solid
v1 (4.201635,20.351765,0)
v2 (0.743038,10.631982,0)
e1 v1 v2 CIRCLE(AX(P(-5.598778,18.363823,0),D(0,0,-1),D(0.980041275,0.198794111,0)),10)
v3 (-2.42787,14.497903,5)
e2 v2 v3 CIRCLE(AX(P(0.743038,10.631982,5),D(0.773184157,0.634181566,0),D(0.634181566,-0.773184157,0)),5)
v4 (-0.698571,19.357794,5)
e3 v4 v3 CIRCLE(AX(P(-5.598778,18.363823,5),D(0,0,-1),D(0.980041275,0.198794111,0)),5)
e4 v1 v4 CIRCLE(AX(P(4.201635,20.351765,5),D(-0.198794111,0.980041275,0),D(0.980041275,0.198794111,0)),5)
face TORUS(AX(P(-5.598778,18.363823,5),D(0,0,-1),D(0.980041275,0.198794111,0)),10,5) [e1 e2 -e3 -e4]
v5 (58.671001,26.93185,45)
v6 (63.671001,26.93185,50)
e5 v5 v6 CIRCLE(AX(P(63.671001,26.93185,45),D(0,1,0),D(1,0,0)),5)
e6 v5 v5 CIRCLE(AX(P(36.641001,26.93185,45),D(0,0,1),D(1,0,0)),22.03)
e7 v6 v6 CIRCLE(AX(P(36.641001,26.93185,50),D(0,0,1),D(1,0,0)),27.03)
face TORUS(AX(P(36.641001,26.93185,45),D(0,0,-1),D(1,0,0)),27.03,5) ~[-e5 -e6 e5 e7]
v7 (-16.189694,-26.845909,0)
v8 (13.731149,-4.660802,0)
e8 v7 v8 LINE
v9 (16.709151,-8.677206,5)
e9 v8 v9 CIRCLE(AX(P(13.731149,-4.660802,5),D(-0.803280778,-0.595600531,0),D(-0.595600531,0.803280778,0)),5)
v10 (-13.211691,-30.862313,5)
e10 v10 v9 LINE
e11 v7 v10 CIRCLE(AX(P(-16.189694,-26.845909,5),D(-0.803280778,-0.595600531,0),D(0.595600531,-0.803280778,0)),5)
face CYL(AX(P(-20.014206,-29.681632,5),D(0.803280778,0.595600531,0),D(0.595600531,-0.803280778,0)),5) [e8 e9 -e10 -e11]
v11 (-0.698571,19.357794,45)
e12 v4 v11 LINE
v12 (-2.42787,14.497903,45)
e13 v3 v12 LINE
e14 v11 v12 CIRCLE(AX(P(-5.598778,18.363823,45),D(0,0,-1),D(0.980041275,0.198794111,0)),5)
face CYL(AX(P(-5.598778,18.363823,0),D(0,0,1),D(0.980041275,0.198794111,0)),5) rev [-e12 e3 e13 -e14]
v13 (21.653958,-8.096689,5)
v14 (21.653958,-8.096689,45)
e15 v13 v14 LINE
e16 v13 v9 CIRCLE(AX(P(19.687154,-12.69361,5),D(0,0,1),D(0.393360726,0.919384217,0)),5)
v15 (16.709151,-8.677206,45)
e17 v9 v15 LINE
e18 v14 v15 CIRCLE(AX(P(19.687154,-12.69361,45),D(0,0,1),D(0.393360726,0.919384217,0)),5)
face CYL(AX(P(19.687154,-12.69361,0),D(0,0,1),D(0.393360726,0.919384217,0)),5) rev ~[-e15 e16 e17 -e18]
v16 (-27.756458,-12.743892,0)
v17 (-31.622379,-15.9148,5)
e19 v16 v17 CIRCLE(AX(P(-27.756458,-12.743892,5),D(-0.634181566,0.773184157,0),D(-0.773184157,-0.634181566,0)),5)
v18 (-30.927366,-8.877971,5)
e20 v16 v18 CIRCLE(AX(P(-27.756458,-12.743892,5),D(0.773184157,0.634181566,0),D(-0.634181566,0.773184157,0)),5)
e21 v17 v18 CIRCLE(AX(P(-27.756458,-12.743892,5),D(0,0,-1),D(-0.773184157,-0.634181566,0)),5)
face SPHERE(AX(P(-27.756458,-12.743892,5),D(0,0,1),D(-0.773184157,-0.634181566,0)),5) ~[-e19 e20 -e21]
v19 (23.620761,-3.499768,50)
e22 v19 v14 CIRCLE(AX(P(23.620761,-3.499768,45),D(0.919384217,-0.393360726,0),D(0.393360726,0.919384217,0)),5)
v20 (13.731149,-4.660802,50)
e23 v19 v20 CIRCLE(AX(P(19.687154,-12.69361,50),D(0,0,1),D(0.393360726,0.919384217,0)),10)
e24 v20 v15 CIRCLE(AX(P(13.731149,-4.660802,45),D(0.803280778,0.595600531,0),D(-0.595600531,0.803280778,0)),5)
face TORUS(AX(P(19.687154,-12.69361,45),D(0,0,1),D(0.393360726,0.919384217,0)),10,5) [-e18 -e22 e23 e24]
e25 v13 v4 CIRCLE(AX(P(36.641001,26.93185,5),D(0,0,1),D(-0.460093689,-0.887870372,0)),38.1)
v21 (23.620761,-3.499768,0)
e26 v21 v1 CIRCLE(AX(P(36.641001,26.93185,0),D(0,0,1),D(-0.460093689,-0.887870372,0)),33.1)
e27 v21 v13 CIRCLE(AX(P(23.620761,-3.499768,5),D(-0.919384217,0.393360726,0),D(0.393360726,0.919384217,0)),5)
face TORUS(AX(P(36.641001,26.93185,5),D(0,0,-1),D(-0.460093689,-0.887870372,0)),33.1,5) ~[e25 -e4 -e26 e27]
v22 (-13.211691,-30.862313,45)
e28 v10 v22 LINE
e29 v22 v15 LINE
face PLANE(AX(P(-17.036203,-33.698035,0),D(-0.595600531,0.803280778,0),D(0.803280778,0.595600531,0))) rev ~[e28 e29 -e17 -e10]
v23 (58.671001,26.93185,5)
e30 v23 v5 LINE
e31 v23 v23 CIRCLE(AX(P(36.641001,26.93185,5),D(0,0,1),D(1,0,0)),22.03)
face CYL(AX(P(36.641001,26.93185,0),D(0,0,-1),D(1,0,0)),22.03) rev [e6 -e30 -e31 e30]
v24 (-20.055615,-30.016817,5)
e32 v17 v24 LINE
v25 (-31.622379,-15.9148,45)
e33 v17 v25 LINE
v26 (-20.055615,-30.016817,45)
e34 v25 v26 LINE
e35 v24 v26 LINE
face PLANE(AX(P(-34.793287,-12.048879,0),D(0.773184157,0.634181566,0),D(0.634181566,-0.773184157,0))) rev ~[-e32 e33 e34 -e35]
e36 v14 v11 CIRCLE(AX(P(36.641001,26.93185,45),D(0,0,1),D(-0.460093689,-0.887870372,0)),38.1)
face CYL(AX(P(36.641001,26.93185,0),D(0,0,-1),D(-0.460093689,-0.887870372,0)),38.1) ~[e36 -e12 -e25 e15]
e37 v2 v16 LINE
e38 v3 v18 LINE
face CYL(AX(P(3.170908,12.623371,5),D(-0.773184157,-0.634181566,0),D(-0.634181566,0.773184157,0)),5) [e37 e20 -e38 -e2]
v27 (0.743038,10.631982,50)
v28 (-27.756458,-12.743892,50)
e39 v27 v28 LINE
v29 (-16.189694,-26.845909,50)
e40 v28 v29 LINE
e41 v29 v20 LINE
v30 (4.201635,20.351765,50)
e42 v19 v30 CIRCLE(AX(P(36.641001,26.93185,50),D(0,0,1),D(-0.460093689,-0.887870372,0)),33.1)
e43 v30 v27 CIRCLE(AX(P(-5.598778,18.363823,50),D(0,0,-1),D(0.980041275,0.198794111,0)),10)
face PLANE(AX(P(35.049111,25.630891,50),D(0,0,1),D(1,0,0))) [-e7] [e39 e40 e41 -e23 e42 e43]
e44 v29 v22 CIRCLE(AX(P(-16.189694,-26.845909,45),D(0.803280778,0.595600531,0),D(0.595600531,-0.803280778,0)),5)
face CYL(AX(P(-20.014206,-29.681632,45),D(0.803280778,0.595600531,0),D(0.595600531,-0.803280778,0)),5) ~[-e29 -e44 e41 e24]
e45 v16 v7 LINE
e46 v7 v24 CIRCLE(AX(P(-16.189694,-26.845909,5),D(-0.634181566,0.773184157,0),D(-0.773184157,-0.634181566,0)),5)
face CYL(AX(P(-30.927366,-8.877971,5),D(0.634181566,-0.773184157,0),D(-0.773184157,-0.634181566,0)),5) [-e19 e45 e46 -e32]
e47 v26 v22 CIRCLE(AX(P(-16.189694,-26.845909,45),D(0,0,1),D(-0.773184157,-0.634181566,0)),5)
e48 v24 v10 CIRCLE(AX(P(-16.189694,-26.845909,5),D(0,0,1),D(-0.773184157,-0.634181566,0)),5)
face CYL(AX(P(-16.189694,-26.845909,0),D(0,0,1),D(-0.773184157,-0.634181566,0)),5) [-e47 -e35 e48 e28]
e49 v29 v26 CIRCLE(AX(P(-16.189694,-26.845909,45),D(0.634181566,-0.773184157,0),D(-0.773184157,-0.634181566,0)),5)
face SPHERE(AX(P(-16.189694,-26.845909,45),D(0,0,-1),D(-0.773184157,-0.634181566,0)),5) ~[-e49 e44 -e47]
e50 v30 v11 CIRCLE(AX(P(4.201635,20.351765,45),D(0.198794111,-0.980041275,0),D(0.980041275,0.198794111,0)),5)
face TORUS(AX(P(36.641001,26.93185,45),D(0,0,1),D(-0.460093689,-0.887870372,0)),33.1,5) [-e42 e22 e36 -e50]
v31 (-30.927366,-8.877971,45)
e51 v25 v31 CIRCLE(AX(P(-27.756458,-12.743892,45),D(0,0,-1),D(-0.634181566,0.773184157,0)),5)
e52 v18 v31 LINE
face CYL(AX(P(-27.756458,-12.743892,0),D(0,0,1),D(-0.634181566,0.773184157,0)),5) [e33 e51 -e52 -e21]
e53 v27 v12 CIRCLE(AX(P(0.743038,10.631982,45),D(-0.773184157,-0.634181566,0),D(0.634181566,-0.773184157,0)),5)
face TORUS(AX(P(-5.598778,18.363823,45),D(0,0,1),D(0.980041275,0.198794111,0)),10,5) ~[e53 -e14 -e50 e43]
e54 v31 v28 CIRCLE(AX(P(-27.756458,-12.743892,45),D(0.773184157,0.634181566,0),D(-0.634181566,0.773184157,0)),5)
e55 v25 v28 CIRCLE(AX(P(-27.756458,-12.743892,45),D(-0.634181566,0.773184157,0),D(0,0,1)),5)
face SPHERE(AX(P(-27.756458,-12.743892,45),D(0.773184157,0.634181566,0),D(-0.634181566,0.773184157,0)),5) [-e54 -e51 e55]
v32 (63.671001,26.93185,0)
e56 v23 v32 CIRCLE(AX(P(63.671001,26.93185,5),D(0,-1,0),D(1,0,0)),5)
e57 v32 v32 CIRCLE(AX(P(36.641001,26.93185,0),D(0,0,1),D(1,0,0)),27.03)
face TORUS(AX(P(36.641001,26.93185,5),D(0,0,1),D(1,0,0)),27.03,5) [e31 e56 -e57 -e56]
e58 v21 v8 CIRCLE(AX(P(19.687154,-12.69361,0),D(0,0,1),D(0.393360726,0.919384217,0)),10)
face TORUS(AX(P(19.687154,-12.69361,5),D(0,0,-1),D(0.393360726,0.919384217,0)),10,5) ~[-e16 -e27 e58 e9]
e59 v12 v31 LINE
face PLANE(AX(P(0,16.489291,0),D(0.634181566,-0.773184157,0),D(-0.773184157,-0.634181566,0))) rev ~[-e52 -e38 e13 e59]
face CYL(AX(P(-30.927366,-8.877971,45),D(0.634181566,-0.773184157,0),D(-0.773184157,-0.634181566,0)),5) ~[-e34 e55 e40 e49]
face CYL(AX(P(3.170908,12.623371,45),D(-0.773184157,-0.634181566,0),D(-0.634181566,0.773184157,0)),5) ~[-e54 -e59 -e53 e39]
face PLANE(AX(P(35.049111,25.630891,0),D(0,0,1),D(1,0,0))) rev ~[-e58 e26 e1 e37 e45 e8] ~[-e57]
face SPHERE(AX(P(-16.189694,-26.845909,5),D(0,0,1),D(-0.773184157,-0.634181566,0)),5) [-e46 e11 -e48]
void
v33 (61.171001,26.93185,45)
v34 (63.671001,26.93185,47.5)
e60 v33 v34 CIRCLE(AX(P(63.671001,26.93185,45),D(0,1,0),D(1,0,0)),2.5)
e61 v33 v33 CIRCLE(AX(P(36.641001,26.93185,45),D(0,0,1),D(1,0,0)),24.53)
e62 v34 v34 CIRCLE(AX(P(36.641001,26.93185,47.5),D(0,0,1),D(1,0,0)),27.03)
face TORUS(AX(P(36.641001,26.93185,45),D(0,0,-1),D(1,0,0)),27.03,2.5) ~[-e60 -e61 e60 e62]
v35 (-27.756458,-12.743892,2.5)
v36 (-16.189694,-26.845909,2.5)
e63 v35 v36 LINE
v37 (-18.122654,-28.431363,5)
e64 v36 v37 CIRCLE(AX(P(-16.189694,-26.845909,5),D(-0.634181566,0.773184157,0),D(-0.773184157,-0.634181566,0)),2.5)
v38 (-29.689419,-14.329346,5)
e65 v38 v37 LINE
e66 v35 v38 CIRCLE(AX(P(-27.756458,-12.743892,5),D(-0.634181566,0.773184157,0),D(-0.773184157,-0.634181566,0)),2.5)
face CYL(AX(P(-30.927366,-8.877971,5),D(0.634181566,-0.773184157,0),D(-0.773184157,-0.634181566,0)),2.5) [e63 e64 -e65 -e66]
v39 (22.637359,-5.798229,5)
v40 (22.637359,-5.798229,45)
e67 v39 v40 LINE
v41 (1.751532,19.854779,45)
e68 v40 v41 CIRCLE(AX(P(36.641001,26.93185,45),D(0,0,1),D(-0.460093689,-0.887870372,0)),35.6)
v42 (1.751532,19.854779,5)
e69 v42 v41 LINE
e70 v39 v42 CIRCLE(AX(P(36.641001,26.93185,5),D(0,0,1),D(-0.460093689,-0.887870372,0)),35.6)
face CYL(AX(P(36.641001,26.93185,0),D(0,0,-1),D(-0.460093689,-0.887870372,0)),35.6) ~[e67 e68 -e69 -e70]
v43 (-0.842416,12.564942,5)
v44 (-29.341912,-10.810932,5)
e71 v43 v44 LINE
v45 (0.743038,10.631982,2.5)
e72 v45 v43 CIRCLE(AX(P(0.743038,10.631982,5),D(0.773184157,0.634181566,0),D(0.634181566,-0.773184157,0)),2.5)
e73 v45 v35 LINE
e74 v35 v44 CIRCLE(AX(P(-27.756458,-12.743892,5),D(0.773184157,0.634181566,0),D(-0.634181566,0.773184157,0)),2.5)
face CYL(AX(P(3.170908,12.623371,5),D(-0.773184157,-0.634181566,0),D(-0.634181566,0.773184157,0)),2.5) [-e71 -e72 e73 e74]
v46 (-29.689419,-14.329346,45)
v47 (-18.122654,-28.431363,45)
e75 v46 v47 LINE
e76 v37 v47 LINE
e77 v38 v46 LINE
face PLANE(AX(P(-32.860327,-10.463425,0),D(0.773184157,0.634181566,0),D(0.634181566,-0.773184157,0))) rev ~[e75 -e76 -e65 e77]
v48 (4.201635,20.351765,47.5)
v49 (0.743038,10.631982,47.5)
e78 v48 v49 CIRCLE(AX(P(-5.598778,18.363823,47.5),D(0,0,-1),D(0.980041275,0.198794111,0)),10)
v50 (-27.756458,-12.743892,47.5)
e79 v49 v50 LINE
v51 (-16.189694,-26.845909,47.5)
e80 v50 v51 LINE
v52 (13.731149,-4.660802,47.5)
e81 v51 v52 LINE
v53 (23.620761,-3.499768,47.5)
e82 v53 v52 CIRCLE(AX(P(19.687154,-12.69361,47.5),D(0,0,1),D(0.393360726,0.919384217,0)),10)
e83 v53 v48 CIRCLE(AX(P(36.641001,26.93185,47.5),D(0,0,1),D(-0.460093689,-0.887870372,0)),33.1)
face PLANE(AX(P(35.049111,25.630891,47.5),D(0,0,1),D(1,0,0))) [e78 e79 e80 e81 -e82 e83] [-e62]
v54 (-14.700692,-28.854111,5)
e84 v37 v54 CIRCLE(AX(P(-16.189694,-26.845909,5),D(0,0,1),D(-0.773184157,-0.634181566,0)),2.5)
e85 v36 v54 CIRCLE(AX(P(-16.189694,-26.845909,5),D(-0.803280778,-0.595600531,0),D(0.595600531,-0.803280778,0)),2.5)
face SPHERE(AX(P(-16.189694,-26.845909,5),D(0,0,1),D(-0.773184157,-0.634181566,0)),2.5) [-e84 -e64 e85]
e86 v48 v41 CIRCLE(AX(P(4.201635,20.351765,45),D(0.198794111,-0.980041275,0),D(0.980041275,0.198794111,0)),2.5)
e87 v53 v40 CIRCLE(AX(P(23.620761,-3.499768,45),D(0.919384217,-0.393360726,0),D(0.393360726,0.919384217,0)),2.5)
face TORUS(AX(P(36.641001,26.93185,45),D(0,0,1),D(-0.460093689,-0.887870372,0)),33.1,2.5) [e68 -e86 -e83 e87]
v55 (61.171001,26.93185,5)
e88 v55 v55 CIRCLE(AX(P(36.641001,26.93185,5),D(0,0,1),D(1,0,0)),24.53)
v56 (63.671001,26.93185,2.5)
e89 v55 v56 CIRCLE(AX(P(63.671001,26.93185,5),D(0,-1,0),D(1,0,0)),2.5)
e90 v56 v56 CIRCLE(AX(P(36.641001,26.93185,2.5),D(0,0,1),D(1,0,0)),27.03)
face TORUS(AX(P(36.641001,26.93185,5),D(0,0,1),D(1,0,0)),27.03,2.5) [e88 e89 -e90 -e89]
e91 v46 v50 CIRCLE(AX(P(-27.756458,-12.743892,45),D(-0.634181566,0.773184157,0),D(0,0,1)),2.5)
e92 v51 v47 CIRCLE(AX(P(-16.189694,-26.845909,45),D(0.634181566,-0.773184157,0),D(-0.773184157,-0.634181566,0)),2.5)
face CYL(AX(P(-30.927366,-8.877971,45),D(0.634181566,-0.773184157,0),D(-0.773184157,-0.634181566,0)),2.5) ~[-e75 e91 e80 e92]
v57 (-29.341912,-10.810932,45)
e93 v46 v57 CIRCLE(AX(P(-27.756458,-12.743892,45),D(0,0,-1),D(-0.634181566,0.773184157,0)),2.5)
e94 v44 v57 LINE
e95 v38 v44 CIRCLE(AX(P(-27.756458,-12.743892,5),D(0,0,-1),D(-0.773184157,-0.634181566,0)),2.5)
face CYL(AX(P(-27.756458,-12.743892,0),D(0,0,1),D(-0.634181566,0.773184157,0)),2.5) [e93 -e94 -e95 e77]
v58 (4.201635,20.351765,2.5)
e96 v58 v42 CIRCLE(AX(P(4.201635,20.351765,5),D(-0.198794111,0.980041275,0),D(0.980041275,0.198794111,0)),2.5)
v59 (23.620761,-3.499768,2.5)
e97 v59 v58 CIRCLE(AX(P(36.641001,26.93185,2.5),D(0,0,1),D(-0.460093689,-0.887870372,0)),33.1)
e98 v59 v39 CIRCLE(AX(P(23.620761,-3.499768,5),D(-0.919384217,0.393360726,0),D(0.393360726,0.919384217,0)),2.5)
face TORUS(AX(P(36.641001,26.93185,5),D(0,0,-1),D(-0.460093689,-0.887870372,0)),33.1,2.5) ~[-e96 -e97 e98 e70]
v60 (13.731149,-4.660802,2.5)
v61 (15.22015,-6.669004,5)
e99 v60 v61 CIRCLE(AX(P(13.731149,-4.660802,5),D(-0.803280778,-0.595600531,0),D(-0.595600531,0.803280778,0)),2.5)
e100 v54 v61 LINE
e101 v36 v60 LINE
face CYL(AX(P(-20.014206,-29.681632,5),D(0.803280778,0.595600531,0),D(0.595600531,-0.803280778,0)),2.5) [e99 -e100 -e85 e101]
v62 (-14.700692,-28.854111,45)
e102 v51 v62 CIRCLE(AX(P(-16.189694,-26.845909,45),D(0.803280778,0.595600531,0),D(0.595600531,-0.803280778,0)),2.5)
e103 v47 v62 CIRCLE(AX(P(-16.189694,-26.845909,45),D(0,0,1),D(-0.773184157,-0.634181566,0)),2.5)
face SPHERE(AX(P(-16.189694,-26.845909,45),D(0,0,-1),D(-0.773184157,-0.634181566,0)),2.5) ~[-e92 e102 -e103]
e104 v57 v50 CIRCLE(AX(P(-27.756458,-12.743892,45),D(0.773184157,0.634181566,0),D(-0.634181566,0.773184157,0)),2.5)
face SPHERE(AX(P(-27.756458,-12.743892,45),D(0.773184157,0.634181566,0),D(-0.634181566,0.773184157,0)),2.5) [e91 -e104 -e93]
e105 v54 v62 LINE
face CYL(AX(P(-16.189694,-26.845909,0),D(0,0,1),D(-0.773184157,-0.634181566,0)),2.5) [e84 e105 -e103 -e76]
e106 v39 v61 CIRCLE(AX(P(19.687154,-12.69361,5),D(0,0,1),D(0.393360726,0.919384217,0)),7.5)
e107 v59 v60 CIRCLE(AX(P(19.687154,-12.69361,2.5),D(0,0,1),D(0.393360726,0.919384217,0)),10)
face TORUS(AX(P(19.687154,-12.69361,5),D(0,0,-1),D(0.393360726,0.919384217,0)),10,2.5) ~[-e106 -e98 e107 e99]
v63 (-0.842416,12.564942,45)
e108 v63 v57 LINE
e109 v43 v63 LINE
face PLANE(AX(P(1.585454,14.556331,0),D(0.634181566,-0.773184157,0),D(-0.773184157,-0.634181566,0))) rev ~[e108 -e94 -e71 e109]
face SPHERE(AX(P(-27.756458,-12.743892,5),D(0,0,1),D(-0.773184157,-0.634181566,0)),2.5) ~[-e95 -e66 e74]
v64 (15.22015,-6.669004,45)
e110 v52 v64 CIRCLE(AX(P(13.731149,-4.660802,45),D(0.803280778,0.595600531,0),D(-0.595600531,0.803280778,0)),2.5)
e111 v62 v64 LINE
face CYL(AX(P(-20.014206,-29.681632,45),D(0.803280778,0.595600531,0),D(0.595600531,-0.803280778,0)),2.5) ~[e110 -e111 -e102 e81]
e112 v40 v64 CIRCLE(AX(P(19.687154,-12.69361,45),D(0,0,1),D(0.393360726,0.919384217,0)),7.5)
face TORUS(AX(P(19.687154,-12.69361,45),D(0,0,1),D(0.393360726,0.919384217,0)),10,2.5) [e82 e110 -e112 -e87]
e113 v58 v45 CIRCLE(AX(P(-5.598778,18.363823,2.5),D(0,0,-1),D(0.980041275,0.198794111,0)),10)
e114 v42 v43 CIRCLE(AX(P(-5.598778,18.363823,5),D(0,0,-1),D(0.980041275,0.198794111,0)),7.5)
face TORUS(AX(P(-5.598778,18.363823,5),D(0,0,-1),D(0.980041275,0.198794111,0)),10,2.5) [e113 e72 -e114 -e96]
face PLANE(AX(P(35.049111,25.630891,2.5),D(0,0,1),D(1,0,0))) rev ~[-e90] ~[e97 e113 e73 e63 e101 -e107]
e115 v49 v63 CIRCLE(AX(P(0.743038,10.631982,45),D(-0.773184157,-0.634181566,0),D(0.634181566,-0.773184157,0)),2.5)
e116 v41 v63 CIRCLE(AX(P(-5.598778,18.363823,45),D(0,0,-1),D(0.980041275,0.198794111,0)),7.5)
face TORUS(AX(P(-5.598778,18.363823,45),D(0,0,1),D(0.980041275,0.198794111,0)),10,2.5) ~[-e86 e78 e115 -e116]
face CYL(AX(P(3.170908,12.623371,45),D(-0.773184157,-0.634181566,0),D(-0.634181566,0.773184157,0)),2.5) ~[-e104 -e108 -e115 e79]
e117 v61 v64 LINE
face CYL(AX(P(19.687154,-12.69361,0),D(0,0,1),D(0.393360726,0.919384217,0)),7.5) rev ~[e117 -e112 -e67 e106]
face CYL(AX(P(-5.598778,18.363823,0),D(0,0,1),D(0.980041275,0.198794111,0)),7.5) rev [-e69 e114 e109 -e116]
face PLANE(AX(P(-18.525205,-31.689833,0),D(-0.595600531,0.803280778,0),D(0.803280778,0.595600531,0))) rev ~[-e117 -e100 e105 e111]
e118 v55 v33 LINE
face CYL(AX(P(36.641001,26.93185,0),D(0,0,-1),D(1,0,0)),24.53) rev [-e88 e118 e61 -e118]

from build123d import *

# Parameters (mm, degrees)
F0_R     = 22.03
F1_DEPTH = 50
F2_R     = 5
F3_T     = -2.5


with BuildPart() as f1:
    # F0 (on Top) → F1 (new body)
    with BuildSketch(Plane.XY):
        with BuildLine():
            ThreePointArc((19.111431778, -6.8960115293), (56.4366245885, -5.6218490797), (74.7410013376, 26.9318496366))
            ThreePointArc((74.7410013376, 26.9318496366), (31.369006979, 64.6653370911), (0, 16.4892914742))
            ThreePointArc((0, 16.4892914742), (7.1396320987, 2.8221168918), (19.111431778, -6.8960115293))
        make_face()
        with Locations((36.6410013376, 26.9318496366)):
            Circle(F0_R, mode=Mode.SUBTRACT)
        with BuildLine():
            ThreePointArc((19.111431778, -6.8960115293), (7.1396320987, 2.8221168918), (0, 16.4892914742))
            Line((0, 16.4892914742), (-34.7932870747, -12.0488790092))
            Line((-34.7932870747, -12.0488790092), (-17.0362032183, -33.6980354112))
            Line((-17.0362032183, -33.6980354112), (19.111431778, -6.8960115293))
        make_face()
    extrude(amount=F1_DEPTH)

    # F2
    f2_edges = [f1.edges().sort_by_distance(p)[0] for p in [
        (66.142371, 51.041582, 50),
        (14.611001, 26.93185, 50),
        (-17.396644, 2.220206, 50),
        (1.037614, -20.297023, 50),
        (0, 16.489291, 25),
        (-34.793287, -12.048879, 25),
        (19.111432, -6.896012, 25),
        (-17.036203, -33.698035, 25),
        (-25.914745, -22.873457, 0),
        (-25.914745, -22.873457, 50),
        (66.142371, 51.041582, 0),
        (14.611001, 26.93185, 0),
        (-17.396644, 2.220206, 0),
        (1.037614, -20.297023, 0),
    ]]
    fillet(f2_edges, radius=F2_R)

    # F3 (hollow: no face is removed)
    offset(amount=F3_T, mode=Mode.SUBTRACT)


solid = f1.part
